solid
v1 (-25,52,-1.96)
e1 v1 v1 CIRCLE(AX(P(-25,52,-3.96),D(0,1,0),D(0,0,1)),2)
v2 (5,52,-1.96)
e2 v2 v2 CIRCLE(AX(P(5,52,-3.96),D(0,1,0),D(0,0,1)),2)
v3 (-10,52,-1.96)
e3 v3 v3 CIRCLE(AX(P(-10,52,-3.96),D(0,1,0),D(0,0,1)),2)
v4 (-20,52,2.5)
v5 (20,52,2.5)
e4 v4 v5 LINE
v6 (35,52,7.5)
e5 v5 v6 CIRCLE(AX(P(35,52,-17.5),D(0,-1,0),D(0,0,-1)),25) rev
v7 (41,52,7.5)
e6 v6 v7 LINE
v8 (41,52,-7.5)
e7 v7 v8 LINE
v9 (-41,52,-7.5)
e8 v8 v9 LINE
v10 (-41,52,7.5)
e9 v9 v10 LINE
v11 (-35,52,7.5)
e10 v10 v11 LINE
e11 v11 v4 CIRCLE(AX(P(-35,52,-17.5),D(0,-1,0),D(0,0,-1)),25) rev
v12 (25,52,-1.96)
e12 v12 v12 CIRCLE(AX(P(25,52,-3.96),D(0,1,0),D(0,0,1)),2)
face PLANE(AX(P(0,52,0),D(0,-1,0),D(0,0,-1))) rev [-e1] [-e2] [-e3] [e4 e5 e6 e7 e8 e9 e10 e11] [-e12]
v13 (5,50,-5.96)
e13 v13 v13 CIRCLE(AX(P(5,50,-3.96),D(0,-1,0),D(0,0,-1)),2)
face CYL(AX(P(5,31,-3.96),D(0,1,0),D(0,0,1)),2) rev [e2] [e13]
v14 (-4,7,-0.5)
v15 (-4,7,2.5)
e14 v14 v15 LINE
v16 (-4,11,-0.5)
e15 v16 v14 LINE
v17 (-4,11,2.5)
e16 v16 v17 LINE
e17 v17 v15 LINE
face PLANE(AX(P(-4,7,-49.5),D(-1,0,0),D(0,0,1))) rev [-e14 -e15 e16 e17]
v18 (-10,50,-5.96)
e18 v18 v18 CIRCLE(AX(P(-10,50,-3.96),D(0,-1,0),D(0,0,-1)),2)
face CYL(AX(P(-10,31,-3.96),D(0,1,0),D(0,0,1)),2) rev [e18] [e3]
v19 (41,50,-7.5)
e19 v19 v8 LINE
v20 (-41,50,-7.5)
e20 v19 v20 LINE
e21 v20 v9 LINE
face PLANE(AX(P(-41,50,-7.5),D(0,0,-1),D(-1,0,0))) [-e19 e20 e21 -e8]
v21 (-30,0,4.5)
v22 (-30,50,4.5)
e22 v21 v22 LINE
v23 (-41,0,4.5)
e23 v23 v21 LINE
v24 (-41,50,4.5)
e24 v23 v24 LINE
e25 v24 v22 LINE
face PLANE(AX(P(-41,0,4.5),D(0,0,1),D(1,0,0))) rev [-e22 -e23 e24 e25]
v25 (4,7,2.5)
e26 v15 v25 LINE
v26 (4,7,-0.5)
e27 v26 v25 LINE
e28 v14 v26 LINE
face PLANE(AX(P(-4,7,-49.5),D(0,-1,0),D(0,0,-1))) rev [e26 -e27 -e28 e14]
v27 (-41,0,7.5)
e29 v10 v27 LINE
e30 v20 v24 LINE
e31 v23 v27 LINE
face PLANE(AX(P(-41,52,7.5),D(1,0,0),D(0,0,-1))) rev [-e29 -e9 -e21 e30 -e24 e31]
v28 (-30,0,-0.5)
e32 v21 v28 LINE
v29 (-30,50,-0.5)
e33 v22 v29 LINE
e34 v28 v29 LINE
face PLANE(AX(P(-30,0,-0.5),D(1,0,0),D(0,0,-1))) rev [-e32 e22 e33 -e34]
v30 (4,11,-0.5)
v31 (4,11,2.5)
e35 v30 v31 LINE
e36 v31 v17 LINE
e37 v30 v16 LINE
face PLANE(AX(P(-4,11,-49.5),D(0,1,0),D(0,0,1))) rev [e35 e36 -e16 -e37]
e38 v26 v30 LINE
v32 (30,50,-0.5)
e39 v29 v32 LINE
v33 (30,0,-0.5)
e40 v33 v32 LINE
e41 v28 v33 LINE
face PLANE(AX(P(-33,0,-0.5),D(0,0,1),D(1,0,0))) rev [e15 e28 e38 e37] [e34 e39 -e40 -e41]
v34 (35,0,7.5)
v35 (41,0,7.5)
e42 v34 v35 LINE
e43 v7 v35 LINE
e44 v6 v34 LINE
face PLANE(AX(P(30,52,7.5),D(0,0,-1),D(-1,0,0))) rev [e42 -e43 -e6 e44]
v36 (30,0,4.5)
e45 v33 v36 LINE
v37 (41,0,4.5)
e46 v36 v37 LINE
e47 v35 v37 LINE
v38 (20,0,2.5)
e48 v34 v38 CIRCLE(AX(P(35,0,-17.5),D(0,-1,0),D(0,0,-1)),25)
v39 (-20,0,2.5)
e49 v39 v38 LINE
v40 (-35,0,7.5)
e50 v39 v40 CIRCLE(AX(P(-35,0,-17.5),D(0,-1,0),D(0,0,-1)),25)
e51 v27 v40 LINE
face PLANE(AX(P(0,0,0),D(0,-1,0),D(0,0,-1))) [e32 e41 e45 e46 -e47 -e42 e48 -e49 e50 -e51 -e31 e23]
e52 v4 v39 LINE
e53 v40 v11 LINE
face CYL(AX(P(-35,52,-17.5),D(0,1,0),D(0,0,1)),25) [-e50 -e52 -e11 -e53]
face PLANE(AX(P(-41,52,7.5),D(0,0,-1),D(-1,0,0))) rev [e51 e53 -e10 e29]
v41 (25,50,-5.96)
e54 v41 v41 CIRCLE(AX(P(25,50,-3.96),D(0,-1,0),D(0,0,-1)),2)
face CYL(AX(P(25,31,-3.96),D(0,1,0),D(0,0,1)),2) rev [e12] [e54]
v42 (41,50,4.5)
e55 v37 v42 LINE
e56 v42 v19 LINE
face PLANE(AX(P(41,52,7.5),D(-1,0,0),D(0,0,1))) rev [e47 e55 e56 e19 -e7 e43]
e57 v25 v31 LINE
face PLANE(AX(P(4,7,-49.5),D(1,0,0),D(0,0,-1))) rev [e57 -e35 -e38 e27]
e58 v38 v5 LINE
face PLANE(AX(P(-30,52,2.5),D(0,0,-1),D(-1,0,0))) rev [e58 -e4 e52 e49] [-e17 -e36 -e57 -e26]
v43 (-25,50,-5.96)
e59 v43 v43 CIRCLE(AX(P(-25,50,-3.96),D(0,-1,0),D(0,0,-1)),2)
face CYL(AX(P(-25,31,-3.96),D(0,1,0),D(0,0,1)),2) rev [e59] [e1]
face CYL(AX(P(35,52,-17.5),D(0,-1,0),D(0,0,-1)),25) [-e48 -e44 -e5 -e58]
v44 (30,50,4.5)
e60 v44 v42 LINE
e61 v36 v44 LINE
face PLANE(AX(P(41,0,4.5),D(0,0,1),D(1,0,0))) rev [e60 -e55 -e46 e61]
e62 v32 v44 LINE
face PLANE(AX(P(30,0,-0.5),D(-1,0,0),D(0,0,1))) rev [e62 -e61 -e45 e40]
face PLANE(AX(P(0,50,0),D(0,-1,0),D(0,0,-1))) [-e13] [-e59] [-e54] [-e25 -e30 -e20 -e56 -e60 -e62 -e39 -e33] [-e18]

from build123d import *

# Parameters (mm, degrees)
BOSS_EXTRUDE1_DEPTH = 52
CUT_EXTRUDE1_DEPTH  = 52
CHAMFER2_SIZE       = 10
SKETCH3_W           = 8
SKETCH3_H           = 4
CUT_EXTRUDE2_DEPTH  = 52
FILLET1_R           = 25
SKETCH4_W           = 3
SKETCH4_H           = 5
CUT_EXTRUDE3_DEPTH  = 52
BOSS_EXTRUDE2_DEPTH = 2
SKETCH6_R           = 2
CUT_EXTRUDE4_DEPTH  = 21


with BuildPart() as part:
    # Sketch1 → Boss-Extrude1 (new body)
    with BuildSketch(Plane(origin=(0, 0, 0), x_dir=(1, 0, 0), z_dir=(0, 1, 0))):
        Polygon((-41, -7.5), (-30, -7.5), (-30, -2.5), (30, -2.5), (30, -7.5), (41, -7.5), (41, 7.5), (-41, 7.5), align=None)
    extrude(amount=BOSS_EXTRUDE1_DEPTH)

    # Sketch2 → Cut-Extrude1 (cut)
    with BuildSketch(Plane(origin=(0, 52, 0), x_dir=(1, 0, 0), z_dir=(0, 1, 0))):
        Polygon((-41, -4.5), (-33, -4.5), (-33, 0.5), (33, 0.5), (33, -4.5), (41, -4.5), (41, 7.5), (33, 7.5), (-33, 7.5), (-41, 7.5), align=None)
    extrude(amount=-CUT_EXTRUDE1_DEPTH, mode=Mode.SUBTRACT)

    # Chamfer2
    # the kernel refuses this chamfer: 10 mm, written as the material it adds along each edge
    with BuildSketch(Plane(origin=(30, 0, 2.5), x_dir=(-0.9996219169112968, 0, -0.02749587661058636), z_dir=(0, 1, 0))) as chamfer2_piece_1_section:
        Polygon((CHAMFER2_SIZE * 0.999621916911, CHAMFER2_SIZE * 0.0274958766106), (-CHAMFER2_SIZE * 0.0274958766106, CHAMFER2_SIZE * 0.999621916911), (0, 0), align=None)
    chamfer2_piece_1 = extrude(amount=52, mode=Mode.PRIVATE)
    chamfer2_piece_1 = split(chamfer2_piece_1, bisect_by=Plane(origin=(26.065989159, 26, 7.5), z_dir=(0, 0, -1)), keep=Keep.TOP, mode=Mode.PRIVATE)
    add(chamfer2_piece_1)
    with BuildSketch(Plane(origin=(-30, 0, 2.5), x_dir=(-0.027495876610586317, 0, 0.9996219169112968), z_dir=(0, 1, 0))) as chamfer2_piece_2_section:
        Polygon((CHAMFER2_SIZE * 0.999621916911, CHAMFER2_SIZE * 0.0274958766106), (-CHAMFER2_SIZE * 0.0274958766106, CHAMFER2_SIZE * 0.999621916911), (0, 0), align=None)
    chamfer2_piece_2 = extrude(amount=52, mode=Mode.PRIVATE)
    chamfer2_piece_2 = split(chamfer2_piece_2, bisect_by=Plane(origin=(-26.065989159, 26, 7.5), z_dir=(0, 0, -1)), keep=Keep.TOP, mode=Mode.PRIVATE)
    add(chamfer2_piece_2)

    # Sketch3 → Cut-Extrude2 (cut)
    with BuildSketch(Plane.XY.offset(2.5)):
        with Locations((0, 9)):
            Rectangle(SKETCH3_W, SKETCH3_H)
    extrude(amount=-CUT_EXTRUDE2_DEPTH, mode=Mode.SUBTRACT)

    # Fillet1
    # the kernel refuses this fillet: 25 mm, written as the material it takes off along each edge
    with BuildSketch(Plane(origin=(25, -25, 7.5), x_dir=(-0.7071067811862641, 0, -0.7071067811868309), z_dir=(0, 1, 0)), Plane(origin=(-25, 77, 7.5), x_dir=(0.7071067811868301, 0, -0.7071067811862649), z_dir=(0, -1, 0))) as fillet1_piece_1:
        with BuildLine():
            CenterArc((10.606601718, -24.748737342), FILLET1_R, 98.130102354, 36.869897646)
            Line((-7.071067812, -7.071067812), (-7.424621202, -6.717514421))
            Line((-7.424621202, -6.717514421), (-0.353553391, 0.353553391))
            Line((-0.353553391, 0.353553391), (0, 0.5))
            ThreePointArc((0, 0.5), (3.535533906, 0.5), (7.000357134, 0.494974747))
            Line((7.000357134, 0.494974747), (7.071067812, 0))
        make_face()
    extrude(amount=102, mode=Mode.SUBTRACT)

    # Sketch4 → Cut-Extrude3 (cut)
    with BuildSketch(Plane(origin=(0, 52, 0), x_dir=(1, 0, 0), z_dir=(0, 1, 0))):
        with Locations((-31.5, -2)):
            Rectangle(SKETCH4_W, SKETCH4_H)
        with Locations((31.5, -2)):
            Rectangle(SKETCH4_W, SKETCH4_H)
    extrude(amount=-CUT_EXTRUDE3_DEPTH, mode=Mode.SUBTRACT)

    # Sketch5 → Boss-Extrude2 (add)
    with BuildSketch(Plane(origin=(0, 52, 0), x_dir=(1, 0, 0), z_dir=(0, 1, 0))):
        Polygon((-30, 0.5), (30, 0.5), (30, -4.5), (41, -4.5), (41, 7.5), (30, 7.5), (-30, 7.5), (-41, 7.5), (-41, -4.5), (-30, -4.5), align=None)
    extrude(amount=-BOSS_EXTRUDE2_DEPTH)

    # Sketch6 → Cut-Extrude4 (cut)
    with BuildSketch(Plane(origin=(0, 52, 0), x_dir=(1, 0, 0), z_dir=(0, 1, 0))):
        with Locations(Location((-25, 3.96, 0), (0, 0, 270))):
            Circle(SKETCH6_R)
        with Locations(Location((-10, 3.96, 0), (0, 0, 270))):
            Circle(SKETCH6_R)
        with Locations(Location((5, 3.96, 0), (0, 0, 270))):
            Circle(SKETCH6_R)
        with Locations(Location((25, 3.96, 0), (0, 0, 270))):
            Circle(SKETCH6_R)
    extrude(amount=-CUT_EXTRUDE4_DEPTH, mode=Mode.SUBTRACT)


solid = part.part
